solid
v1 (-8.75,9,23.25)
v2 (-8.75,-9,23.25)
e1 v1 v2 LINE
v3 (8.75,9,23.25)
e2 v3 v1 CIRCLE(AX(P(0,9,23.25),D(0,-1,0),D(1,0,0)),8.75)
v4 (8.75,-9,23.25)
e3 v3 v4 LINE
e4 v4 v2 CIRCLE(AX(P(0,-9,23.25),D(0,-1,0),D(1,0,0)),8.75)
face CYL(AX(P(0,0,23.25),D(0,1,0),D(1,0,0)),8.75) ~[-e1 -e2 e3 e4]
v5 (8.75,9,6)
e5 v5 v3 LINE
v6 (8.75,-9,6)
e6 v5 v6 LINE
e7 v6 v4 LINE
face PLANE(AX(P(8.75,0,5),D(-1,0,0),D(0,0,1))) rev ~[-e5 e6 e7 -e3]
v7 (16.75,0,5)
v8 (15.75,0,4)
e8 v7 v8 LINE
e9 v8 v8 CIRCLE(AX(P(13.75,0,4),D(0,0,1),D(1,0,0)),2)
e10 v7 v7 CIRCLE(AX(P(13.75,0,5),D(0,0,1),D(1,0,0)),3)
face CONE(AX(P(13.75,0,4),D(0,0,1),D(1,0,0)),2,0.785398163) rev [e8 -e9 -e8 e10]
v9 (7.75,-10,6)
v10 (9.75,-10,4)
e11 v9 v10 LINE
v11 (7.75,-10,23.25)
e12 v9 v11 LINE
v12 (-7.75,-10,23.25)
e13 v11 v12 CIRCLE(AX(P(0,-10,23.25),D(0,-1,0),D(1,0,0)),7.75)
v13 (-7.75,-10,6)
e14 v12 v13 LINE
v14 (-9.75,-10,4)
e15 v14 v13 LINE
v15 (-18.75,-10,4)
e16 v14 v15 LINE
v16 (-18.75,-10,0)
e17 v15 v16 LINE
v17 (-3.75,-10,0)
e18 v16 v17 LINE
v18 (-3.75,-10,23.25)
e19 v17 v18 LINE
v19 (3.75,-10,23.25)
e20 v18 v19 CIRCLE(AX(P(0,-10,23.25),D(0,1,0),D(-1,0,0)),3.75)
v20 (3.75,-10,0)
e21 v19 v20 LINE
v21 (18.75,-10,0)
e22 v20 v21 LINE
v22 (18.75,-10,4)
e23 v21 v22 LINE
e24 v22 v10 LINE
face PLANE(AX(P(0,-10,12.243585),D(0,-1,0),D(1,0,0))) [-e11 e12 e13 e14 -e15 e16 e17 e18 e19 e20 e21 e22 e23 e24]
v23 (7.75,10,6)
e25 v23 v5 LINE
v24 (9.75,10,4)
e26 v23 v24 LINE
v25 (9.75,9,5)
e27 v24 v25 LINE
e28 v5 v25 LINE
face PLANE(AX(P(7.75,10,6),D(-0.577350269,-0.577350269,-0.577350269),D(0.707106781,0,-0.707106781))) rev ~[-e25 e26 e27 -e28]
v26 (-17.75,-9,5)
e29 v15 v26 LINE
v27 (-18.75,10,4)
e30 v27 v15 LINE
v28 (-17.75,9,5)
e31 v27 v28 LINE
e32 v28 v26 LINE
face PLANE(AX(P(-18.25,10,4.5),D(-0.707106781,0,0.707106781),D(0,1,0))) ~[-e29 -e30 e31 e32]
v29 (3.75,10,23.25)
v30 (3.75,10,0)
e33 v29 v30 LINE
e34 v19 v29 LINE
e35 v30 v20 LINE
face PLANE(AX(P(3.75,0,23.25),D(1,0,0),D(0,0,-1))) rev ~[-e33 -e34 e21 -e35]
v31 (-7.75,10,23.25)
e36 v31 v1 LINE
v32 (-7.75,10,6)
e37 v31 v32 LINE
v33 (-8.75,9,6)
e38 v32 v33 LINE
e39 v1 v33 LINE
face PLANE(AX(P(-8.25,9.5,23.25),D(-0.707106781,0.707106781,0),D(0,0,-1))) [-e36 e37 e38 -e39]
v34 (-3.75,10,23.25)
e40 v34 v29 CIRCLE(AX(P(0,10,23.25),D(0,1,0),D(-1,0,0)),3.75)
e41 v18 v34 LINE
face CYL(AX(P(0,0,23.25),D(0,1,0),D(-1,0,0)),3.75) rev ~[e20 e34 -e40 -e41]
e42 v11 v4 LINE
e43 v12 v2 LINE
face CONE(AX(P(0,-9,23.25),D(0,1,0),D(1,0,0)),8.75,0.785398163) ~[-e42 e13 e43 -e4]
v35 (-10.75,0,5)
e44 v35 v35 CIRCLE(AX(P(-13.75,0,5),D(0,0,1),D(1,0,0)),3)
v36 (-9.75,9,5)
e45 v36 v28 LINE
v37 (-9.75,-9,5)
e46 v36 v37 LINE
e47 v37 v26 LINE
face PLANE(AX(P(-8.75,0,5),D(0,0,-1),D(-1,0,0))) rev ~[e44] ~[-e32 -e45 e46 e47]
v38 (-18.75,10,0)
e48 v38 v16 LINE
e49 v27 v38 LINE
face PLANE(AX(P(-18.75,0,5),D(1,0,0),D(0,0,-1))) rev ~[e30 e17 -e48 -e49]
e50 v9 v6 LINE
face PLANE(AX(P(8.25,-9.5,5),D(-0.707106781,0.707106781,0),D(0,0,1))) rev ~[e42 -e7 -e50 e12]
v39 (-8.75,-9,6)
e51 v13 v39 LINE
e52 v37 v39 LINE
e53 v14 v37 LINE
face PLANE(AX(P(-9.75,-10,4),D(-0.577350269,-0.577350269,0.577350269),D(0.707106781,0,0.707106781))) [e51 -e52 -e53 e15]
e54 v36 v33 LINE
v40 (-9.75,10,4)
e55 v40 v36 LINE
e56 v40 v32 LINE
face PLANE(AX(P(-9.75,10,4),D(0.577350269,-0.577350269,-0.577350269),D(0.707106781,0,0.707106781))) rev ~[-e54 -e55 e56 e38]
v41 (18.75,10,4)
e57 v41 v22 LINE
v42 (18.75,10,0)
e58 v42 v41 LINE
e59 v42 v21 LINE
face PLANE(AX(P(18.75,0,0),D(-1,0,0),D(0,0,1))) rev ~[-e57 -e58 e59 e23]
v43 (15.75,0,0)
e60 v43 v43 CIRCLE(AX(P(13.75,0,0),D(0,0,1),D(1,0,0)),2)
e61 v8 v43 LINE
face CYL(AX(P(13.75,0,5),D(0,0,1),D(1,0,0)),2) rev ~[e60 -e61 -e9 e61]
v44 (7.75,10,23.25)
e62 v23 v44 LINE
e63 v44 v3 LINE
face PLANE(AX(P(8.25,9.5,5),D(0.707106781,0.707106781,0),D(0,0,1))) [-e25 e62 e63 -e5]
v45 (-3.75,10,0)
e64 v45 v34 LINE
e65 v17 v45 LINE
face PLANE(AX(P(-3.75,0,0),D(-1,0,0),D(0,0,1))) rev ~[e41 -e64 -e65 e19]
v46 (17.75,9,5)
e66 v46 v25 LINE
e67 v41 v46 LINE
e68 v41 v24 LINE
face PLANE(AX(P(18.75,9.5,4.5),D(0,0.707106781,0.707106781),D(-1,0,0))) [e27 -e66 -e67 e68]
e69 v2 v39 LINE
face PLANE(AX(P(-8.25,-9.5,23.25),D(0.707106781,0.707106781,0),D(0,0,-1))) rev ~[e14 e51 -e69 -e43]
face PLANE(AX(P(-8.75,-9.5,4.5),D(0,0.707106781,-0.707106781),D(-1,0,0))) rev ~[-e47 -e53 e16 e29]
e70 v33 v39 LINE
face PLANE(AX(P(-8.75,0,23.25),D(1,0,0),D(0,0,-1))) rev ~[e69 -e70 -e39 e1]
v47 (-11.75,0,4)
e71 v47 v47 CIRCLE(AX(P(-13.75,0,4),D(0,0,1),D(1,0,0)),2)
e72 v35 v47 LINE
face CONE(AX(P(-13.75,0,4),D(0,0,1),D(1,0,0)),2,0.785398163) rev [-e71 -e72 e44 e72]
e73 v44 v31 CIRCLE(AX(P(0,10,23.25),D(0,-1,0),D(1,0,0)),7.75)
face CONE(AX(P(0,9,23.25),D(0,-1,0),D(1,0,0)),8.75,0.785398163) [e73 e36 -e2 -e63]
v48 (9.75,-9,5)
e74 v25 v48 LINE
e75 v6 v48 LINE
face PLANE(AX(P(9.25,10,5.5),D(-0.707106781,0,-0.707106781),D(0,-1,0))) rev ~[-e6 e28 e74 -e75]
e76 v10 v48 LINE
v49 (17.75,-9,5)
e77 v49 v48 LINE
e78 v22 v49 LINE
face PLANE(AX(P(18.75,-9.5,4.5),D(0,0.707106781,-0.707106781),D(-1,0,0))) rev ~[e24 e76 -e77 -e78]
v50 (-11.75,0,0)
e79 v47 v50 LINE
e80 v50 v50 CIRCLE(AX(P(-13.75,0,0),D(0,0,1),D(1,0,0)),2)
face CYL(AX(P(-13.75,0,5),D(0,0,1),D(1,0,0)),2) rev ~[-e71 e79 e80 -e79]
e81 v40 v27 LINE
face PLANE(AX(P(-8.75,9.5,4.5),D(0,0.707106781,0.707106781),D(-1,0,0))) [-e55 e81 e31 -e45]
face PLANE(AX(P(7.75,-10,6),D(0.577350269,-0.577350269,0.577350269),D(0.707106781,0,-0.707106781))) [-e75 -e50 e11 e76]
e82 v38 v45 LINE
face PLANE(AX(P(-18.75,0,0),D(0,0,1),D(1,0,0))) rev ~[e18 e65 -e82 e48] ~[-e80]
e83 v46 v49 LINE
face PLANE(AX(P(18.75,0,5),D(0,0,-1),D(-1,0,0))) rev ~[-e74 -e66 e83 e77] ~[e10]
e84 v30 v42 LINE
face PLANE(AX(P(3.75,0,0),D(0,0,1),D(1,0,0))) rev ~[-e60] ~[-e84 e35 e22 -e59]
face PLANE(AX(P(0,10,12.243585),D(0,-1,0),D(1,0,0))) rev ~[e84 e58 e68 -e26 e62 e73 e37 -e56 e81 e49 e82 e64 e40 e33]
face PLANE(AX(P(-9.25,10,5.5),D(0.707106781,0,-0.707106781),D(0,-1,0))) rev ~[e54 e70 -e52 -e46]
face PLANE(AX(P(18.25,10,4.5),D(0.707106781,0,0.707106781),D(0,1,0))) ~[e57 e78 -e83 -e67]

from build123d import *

# Parameters (mm, degrees)
F1_DEPTH      = 10
F1_DEPTH_BACK = 10
F2_R          = 2
F3_DEPTH      = 25
F4_SIZE       = 1


with BuildPart() as f1:
    # F0 (on Front) → F1 (new body, two sides)
    with BuildSketch(Plane.XZ) as f1_sk:
        with BuildLine():
            Line((3.75, 23.25), (3.75, 0))
            Line((3.75, 0), (18.75, 0))
            Line((18.75, 0), (18.75, 5))
            Line((18.75, 5), (8.75, 5))
            Line((8.75, 5), (8.75, 23.25))
            ThreePointArc((8.75, 23.25), (0, 32), (-8.75, 23.25))
            Line((-8.75, 23.25), (-8.75, 5))
            Line((-8.75, 5), (-18.75, 5))
            Line((-18.75, 5), (-18.75, 0))
            Line((-18.75, 0), (-3.75, 0))
            Line((-3.75, 0), (-3.75, 23.25))
            ThreePointArc((-3.75, 23.25), (0, 27), (3.75, 23.25))
        make_face()
    extrude(amount=-F1_DEPTH)
    extrude(f1_sk.sketch, amount=F1_DEPTH_BACK)

    # F2 (on face) → F3 (cut)
    with BuildSketch(Plane.XY.offset(5)):
        with Locations((-13.75, 0)):
            Circle(F2_R)
        with Locations((13.75, 0)):
            Circle(F2_R)
    extrude(amount=-F3_DEPTH, mode=Mode.SUBTRACT)

    # F4
    f4_edges = [f1.edges().sort_by_distance(p)[0] for p in [
        (11.75, 0, 5),
        (-15.75, 0, 5),
        (13.75, -10, 5),
        (18.75, 0, 5),
        (13.75, 10, 5),
        (8.75, 0, 5),
        (-8.75, 0, 5),
        (-13.75, 10, 5),
        (-13.75, -10, 5),
        (-18.75, 0, 5),
        (8.75, 10, 14.125),
        (0, 10, 32),
        (-8.75, 10, 14.125),
        (8.75, -10, 14.125),
        (0, -10, 32),
        (-8.75, -10, 14.125),
    ]]
    chamfer(f4_edges, length=F4_SIZE)


solid = f1.part
